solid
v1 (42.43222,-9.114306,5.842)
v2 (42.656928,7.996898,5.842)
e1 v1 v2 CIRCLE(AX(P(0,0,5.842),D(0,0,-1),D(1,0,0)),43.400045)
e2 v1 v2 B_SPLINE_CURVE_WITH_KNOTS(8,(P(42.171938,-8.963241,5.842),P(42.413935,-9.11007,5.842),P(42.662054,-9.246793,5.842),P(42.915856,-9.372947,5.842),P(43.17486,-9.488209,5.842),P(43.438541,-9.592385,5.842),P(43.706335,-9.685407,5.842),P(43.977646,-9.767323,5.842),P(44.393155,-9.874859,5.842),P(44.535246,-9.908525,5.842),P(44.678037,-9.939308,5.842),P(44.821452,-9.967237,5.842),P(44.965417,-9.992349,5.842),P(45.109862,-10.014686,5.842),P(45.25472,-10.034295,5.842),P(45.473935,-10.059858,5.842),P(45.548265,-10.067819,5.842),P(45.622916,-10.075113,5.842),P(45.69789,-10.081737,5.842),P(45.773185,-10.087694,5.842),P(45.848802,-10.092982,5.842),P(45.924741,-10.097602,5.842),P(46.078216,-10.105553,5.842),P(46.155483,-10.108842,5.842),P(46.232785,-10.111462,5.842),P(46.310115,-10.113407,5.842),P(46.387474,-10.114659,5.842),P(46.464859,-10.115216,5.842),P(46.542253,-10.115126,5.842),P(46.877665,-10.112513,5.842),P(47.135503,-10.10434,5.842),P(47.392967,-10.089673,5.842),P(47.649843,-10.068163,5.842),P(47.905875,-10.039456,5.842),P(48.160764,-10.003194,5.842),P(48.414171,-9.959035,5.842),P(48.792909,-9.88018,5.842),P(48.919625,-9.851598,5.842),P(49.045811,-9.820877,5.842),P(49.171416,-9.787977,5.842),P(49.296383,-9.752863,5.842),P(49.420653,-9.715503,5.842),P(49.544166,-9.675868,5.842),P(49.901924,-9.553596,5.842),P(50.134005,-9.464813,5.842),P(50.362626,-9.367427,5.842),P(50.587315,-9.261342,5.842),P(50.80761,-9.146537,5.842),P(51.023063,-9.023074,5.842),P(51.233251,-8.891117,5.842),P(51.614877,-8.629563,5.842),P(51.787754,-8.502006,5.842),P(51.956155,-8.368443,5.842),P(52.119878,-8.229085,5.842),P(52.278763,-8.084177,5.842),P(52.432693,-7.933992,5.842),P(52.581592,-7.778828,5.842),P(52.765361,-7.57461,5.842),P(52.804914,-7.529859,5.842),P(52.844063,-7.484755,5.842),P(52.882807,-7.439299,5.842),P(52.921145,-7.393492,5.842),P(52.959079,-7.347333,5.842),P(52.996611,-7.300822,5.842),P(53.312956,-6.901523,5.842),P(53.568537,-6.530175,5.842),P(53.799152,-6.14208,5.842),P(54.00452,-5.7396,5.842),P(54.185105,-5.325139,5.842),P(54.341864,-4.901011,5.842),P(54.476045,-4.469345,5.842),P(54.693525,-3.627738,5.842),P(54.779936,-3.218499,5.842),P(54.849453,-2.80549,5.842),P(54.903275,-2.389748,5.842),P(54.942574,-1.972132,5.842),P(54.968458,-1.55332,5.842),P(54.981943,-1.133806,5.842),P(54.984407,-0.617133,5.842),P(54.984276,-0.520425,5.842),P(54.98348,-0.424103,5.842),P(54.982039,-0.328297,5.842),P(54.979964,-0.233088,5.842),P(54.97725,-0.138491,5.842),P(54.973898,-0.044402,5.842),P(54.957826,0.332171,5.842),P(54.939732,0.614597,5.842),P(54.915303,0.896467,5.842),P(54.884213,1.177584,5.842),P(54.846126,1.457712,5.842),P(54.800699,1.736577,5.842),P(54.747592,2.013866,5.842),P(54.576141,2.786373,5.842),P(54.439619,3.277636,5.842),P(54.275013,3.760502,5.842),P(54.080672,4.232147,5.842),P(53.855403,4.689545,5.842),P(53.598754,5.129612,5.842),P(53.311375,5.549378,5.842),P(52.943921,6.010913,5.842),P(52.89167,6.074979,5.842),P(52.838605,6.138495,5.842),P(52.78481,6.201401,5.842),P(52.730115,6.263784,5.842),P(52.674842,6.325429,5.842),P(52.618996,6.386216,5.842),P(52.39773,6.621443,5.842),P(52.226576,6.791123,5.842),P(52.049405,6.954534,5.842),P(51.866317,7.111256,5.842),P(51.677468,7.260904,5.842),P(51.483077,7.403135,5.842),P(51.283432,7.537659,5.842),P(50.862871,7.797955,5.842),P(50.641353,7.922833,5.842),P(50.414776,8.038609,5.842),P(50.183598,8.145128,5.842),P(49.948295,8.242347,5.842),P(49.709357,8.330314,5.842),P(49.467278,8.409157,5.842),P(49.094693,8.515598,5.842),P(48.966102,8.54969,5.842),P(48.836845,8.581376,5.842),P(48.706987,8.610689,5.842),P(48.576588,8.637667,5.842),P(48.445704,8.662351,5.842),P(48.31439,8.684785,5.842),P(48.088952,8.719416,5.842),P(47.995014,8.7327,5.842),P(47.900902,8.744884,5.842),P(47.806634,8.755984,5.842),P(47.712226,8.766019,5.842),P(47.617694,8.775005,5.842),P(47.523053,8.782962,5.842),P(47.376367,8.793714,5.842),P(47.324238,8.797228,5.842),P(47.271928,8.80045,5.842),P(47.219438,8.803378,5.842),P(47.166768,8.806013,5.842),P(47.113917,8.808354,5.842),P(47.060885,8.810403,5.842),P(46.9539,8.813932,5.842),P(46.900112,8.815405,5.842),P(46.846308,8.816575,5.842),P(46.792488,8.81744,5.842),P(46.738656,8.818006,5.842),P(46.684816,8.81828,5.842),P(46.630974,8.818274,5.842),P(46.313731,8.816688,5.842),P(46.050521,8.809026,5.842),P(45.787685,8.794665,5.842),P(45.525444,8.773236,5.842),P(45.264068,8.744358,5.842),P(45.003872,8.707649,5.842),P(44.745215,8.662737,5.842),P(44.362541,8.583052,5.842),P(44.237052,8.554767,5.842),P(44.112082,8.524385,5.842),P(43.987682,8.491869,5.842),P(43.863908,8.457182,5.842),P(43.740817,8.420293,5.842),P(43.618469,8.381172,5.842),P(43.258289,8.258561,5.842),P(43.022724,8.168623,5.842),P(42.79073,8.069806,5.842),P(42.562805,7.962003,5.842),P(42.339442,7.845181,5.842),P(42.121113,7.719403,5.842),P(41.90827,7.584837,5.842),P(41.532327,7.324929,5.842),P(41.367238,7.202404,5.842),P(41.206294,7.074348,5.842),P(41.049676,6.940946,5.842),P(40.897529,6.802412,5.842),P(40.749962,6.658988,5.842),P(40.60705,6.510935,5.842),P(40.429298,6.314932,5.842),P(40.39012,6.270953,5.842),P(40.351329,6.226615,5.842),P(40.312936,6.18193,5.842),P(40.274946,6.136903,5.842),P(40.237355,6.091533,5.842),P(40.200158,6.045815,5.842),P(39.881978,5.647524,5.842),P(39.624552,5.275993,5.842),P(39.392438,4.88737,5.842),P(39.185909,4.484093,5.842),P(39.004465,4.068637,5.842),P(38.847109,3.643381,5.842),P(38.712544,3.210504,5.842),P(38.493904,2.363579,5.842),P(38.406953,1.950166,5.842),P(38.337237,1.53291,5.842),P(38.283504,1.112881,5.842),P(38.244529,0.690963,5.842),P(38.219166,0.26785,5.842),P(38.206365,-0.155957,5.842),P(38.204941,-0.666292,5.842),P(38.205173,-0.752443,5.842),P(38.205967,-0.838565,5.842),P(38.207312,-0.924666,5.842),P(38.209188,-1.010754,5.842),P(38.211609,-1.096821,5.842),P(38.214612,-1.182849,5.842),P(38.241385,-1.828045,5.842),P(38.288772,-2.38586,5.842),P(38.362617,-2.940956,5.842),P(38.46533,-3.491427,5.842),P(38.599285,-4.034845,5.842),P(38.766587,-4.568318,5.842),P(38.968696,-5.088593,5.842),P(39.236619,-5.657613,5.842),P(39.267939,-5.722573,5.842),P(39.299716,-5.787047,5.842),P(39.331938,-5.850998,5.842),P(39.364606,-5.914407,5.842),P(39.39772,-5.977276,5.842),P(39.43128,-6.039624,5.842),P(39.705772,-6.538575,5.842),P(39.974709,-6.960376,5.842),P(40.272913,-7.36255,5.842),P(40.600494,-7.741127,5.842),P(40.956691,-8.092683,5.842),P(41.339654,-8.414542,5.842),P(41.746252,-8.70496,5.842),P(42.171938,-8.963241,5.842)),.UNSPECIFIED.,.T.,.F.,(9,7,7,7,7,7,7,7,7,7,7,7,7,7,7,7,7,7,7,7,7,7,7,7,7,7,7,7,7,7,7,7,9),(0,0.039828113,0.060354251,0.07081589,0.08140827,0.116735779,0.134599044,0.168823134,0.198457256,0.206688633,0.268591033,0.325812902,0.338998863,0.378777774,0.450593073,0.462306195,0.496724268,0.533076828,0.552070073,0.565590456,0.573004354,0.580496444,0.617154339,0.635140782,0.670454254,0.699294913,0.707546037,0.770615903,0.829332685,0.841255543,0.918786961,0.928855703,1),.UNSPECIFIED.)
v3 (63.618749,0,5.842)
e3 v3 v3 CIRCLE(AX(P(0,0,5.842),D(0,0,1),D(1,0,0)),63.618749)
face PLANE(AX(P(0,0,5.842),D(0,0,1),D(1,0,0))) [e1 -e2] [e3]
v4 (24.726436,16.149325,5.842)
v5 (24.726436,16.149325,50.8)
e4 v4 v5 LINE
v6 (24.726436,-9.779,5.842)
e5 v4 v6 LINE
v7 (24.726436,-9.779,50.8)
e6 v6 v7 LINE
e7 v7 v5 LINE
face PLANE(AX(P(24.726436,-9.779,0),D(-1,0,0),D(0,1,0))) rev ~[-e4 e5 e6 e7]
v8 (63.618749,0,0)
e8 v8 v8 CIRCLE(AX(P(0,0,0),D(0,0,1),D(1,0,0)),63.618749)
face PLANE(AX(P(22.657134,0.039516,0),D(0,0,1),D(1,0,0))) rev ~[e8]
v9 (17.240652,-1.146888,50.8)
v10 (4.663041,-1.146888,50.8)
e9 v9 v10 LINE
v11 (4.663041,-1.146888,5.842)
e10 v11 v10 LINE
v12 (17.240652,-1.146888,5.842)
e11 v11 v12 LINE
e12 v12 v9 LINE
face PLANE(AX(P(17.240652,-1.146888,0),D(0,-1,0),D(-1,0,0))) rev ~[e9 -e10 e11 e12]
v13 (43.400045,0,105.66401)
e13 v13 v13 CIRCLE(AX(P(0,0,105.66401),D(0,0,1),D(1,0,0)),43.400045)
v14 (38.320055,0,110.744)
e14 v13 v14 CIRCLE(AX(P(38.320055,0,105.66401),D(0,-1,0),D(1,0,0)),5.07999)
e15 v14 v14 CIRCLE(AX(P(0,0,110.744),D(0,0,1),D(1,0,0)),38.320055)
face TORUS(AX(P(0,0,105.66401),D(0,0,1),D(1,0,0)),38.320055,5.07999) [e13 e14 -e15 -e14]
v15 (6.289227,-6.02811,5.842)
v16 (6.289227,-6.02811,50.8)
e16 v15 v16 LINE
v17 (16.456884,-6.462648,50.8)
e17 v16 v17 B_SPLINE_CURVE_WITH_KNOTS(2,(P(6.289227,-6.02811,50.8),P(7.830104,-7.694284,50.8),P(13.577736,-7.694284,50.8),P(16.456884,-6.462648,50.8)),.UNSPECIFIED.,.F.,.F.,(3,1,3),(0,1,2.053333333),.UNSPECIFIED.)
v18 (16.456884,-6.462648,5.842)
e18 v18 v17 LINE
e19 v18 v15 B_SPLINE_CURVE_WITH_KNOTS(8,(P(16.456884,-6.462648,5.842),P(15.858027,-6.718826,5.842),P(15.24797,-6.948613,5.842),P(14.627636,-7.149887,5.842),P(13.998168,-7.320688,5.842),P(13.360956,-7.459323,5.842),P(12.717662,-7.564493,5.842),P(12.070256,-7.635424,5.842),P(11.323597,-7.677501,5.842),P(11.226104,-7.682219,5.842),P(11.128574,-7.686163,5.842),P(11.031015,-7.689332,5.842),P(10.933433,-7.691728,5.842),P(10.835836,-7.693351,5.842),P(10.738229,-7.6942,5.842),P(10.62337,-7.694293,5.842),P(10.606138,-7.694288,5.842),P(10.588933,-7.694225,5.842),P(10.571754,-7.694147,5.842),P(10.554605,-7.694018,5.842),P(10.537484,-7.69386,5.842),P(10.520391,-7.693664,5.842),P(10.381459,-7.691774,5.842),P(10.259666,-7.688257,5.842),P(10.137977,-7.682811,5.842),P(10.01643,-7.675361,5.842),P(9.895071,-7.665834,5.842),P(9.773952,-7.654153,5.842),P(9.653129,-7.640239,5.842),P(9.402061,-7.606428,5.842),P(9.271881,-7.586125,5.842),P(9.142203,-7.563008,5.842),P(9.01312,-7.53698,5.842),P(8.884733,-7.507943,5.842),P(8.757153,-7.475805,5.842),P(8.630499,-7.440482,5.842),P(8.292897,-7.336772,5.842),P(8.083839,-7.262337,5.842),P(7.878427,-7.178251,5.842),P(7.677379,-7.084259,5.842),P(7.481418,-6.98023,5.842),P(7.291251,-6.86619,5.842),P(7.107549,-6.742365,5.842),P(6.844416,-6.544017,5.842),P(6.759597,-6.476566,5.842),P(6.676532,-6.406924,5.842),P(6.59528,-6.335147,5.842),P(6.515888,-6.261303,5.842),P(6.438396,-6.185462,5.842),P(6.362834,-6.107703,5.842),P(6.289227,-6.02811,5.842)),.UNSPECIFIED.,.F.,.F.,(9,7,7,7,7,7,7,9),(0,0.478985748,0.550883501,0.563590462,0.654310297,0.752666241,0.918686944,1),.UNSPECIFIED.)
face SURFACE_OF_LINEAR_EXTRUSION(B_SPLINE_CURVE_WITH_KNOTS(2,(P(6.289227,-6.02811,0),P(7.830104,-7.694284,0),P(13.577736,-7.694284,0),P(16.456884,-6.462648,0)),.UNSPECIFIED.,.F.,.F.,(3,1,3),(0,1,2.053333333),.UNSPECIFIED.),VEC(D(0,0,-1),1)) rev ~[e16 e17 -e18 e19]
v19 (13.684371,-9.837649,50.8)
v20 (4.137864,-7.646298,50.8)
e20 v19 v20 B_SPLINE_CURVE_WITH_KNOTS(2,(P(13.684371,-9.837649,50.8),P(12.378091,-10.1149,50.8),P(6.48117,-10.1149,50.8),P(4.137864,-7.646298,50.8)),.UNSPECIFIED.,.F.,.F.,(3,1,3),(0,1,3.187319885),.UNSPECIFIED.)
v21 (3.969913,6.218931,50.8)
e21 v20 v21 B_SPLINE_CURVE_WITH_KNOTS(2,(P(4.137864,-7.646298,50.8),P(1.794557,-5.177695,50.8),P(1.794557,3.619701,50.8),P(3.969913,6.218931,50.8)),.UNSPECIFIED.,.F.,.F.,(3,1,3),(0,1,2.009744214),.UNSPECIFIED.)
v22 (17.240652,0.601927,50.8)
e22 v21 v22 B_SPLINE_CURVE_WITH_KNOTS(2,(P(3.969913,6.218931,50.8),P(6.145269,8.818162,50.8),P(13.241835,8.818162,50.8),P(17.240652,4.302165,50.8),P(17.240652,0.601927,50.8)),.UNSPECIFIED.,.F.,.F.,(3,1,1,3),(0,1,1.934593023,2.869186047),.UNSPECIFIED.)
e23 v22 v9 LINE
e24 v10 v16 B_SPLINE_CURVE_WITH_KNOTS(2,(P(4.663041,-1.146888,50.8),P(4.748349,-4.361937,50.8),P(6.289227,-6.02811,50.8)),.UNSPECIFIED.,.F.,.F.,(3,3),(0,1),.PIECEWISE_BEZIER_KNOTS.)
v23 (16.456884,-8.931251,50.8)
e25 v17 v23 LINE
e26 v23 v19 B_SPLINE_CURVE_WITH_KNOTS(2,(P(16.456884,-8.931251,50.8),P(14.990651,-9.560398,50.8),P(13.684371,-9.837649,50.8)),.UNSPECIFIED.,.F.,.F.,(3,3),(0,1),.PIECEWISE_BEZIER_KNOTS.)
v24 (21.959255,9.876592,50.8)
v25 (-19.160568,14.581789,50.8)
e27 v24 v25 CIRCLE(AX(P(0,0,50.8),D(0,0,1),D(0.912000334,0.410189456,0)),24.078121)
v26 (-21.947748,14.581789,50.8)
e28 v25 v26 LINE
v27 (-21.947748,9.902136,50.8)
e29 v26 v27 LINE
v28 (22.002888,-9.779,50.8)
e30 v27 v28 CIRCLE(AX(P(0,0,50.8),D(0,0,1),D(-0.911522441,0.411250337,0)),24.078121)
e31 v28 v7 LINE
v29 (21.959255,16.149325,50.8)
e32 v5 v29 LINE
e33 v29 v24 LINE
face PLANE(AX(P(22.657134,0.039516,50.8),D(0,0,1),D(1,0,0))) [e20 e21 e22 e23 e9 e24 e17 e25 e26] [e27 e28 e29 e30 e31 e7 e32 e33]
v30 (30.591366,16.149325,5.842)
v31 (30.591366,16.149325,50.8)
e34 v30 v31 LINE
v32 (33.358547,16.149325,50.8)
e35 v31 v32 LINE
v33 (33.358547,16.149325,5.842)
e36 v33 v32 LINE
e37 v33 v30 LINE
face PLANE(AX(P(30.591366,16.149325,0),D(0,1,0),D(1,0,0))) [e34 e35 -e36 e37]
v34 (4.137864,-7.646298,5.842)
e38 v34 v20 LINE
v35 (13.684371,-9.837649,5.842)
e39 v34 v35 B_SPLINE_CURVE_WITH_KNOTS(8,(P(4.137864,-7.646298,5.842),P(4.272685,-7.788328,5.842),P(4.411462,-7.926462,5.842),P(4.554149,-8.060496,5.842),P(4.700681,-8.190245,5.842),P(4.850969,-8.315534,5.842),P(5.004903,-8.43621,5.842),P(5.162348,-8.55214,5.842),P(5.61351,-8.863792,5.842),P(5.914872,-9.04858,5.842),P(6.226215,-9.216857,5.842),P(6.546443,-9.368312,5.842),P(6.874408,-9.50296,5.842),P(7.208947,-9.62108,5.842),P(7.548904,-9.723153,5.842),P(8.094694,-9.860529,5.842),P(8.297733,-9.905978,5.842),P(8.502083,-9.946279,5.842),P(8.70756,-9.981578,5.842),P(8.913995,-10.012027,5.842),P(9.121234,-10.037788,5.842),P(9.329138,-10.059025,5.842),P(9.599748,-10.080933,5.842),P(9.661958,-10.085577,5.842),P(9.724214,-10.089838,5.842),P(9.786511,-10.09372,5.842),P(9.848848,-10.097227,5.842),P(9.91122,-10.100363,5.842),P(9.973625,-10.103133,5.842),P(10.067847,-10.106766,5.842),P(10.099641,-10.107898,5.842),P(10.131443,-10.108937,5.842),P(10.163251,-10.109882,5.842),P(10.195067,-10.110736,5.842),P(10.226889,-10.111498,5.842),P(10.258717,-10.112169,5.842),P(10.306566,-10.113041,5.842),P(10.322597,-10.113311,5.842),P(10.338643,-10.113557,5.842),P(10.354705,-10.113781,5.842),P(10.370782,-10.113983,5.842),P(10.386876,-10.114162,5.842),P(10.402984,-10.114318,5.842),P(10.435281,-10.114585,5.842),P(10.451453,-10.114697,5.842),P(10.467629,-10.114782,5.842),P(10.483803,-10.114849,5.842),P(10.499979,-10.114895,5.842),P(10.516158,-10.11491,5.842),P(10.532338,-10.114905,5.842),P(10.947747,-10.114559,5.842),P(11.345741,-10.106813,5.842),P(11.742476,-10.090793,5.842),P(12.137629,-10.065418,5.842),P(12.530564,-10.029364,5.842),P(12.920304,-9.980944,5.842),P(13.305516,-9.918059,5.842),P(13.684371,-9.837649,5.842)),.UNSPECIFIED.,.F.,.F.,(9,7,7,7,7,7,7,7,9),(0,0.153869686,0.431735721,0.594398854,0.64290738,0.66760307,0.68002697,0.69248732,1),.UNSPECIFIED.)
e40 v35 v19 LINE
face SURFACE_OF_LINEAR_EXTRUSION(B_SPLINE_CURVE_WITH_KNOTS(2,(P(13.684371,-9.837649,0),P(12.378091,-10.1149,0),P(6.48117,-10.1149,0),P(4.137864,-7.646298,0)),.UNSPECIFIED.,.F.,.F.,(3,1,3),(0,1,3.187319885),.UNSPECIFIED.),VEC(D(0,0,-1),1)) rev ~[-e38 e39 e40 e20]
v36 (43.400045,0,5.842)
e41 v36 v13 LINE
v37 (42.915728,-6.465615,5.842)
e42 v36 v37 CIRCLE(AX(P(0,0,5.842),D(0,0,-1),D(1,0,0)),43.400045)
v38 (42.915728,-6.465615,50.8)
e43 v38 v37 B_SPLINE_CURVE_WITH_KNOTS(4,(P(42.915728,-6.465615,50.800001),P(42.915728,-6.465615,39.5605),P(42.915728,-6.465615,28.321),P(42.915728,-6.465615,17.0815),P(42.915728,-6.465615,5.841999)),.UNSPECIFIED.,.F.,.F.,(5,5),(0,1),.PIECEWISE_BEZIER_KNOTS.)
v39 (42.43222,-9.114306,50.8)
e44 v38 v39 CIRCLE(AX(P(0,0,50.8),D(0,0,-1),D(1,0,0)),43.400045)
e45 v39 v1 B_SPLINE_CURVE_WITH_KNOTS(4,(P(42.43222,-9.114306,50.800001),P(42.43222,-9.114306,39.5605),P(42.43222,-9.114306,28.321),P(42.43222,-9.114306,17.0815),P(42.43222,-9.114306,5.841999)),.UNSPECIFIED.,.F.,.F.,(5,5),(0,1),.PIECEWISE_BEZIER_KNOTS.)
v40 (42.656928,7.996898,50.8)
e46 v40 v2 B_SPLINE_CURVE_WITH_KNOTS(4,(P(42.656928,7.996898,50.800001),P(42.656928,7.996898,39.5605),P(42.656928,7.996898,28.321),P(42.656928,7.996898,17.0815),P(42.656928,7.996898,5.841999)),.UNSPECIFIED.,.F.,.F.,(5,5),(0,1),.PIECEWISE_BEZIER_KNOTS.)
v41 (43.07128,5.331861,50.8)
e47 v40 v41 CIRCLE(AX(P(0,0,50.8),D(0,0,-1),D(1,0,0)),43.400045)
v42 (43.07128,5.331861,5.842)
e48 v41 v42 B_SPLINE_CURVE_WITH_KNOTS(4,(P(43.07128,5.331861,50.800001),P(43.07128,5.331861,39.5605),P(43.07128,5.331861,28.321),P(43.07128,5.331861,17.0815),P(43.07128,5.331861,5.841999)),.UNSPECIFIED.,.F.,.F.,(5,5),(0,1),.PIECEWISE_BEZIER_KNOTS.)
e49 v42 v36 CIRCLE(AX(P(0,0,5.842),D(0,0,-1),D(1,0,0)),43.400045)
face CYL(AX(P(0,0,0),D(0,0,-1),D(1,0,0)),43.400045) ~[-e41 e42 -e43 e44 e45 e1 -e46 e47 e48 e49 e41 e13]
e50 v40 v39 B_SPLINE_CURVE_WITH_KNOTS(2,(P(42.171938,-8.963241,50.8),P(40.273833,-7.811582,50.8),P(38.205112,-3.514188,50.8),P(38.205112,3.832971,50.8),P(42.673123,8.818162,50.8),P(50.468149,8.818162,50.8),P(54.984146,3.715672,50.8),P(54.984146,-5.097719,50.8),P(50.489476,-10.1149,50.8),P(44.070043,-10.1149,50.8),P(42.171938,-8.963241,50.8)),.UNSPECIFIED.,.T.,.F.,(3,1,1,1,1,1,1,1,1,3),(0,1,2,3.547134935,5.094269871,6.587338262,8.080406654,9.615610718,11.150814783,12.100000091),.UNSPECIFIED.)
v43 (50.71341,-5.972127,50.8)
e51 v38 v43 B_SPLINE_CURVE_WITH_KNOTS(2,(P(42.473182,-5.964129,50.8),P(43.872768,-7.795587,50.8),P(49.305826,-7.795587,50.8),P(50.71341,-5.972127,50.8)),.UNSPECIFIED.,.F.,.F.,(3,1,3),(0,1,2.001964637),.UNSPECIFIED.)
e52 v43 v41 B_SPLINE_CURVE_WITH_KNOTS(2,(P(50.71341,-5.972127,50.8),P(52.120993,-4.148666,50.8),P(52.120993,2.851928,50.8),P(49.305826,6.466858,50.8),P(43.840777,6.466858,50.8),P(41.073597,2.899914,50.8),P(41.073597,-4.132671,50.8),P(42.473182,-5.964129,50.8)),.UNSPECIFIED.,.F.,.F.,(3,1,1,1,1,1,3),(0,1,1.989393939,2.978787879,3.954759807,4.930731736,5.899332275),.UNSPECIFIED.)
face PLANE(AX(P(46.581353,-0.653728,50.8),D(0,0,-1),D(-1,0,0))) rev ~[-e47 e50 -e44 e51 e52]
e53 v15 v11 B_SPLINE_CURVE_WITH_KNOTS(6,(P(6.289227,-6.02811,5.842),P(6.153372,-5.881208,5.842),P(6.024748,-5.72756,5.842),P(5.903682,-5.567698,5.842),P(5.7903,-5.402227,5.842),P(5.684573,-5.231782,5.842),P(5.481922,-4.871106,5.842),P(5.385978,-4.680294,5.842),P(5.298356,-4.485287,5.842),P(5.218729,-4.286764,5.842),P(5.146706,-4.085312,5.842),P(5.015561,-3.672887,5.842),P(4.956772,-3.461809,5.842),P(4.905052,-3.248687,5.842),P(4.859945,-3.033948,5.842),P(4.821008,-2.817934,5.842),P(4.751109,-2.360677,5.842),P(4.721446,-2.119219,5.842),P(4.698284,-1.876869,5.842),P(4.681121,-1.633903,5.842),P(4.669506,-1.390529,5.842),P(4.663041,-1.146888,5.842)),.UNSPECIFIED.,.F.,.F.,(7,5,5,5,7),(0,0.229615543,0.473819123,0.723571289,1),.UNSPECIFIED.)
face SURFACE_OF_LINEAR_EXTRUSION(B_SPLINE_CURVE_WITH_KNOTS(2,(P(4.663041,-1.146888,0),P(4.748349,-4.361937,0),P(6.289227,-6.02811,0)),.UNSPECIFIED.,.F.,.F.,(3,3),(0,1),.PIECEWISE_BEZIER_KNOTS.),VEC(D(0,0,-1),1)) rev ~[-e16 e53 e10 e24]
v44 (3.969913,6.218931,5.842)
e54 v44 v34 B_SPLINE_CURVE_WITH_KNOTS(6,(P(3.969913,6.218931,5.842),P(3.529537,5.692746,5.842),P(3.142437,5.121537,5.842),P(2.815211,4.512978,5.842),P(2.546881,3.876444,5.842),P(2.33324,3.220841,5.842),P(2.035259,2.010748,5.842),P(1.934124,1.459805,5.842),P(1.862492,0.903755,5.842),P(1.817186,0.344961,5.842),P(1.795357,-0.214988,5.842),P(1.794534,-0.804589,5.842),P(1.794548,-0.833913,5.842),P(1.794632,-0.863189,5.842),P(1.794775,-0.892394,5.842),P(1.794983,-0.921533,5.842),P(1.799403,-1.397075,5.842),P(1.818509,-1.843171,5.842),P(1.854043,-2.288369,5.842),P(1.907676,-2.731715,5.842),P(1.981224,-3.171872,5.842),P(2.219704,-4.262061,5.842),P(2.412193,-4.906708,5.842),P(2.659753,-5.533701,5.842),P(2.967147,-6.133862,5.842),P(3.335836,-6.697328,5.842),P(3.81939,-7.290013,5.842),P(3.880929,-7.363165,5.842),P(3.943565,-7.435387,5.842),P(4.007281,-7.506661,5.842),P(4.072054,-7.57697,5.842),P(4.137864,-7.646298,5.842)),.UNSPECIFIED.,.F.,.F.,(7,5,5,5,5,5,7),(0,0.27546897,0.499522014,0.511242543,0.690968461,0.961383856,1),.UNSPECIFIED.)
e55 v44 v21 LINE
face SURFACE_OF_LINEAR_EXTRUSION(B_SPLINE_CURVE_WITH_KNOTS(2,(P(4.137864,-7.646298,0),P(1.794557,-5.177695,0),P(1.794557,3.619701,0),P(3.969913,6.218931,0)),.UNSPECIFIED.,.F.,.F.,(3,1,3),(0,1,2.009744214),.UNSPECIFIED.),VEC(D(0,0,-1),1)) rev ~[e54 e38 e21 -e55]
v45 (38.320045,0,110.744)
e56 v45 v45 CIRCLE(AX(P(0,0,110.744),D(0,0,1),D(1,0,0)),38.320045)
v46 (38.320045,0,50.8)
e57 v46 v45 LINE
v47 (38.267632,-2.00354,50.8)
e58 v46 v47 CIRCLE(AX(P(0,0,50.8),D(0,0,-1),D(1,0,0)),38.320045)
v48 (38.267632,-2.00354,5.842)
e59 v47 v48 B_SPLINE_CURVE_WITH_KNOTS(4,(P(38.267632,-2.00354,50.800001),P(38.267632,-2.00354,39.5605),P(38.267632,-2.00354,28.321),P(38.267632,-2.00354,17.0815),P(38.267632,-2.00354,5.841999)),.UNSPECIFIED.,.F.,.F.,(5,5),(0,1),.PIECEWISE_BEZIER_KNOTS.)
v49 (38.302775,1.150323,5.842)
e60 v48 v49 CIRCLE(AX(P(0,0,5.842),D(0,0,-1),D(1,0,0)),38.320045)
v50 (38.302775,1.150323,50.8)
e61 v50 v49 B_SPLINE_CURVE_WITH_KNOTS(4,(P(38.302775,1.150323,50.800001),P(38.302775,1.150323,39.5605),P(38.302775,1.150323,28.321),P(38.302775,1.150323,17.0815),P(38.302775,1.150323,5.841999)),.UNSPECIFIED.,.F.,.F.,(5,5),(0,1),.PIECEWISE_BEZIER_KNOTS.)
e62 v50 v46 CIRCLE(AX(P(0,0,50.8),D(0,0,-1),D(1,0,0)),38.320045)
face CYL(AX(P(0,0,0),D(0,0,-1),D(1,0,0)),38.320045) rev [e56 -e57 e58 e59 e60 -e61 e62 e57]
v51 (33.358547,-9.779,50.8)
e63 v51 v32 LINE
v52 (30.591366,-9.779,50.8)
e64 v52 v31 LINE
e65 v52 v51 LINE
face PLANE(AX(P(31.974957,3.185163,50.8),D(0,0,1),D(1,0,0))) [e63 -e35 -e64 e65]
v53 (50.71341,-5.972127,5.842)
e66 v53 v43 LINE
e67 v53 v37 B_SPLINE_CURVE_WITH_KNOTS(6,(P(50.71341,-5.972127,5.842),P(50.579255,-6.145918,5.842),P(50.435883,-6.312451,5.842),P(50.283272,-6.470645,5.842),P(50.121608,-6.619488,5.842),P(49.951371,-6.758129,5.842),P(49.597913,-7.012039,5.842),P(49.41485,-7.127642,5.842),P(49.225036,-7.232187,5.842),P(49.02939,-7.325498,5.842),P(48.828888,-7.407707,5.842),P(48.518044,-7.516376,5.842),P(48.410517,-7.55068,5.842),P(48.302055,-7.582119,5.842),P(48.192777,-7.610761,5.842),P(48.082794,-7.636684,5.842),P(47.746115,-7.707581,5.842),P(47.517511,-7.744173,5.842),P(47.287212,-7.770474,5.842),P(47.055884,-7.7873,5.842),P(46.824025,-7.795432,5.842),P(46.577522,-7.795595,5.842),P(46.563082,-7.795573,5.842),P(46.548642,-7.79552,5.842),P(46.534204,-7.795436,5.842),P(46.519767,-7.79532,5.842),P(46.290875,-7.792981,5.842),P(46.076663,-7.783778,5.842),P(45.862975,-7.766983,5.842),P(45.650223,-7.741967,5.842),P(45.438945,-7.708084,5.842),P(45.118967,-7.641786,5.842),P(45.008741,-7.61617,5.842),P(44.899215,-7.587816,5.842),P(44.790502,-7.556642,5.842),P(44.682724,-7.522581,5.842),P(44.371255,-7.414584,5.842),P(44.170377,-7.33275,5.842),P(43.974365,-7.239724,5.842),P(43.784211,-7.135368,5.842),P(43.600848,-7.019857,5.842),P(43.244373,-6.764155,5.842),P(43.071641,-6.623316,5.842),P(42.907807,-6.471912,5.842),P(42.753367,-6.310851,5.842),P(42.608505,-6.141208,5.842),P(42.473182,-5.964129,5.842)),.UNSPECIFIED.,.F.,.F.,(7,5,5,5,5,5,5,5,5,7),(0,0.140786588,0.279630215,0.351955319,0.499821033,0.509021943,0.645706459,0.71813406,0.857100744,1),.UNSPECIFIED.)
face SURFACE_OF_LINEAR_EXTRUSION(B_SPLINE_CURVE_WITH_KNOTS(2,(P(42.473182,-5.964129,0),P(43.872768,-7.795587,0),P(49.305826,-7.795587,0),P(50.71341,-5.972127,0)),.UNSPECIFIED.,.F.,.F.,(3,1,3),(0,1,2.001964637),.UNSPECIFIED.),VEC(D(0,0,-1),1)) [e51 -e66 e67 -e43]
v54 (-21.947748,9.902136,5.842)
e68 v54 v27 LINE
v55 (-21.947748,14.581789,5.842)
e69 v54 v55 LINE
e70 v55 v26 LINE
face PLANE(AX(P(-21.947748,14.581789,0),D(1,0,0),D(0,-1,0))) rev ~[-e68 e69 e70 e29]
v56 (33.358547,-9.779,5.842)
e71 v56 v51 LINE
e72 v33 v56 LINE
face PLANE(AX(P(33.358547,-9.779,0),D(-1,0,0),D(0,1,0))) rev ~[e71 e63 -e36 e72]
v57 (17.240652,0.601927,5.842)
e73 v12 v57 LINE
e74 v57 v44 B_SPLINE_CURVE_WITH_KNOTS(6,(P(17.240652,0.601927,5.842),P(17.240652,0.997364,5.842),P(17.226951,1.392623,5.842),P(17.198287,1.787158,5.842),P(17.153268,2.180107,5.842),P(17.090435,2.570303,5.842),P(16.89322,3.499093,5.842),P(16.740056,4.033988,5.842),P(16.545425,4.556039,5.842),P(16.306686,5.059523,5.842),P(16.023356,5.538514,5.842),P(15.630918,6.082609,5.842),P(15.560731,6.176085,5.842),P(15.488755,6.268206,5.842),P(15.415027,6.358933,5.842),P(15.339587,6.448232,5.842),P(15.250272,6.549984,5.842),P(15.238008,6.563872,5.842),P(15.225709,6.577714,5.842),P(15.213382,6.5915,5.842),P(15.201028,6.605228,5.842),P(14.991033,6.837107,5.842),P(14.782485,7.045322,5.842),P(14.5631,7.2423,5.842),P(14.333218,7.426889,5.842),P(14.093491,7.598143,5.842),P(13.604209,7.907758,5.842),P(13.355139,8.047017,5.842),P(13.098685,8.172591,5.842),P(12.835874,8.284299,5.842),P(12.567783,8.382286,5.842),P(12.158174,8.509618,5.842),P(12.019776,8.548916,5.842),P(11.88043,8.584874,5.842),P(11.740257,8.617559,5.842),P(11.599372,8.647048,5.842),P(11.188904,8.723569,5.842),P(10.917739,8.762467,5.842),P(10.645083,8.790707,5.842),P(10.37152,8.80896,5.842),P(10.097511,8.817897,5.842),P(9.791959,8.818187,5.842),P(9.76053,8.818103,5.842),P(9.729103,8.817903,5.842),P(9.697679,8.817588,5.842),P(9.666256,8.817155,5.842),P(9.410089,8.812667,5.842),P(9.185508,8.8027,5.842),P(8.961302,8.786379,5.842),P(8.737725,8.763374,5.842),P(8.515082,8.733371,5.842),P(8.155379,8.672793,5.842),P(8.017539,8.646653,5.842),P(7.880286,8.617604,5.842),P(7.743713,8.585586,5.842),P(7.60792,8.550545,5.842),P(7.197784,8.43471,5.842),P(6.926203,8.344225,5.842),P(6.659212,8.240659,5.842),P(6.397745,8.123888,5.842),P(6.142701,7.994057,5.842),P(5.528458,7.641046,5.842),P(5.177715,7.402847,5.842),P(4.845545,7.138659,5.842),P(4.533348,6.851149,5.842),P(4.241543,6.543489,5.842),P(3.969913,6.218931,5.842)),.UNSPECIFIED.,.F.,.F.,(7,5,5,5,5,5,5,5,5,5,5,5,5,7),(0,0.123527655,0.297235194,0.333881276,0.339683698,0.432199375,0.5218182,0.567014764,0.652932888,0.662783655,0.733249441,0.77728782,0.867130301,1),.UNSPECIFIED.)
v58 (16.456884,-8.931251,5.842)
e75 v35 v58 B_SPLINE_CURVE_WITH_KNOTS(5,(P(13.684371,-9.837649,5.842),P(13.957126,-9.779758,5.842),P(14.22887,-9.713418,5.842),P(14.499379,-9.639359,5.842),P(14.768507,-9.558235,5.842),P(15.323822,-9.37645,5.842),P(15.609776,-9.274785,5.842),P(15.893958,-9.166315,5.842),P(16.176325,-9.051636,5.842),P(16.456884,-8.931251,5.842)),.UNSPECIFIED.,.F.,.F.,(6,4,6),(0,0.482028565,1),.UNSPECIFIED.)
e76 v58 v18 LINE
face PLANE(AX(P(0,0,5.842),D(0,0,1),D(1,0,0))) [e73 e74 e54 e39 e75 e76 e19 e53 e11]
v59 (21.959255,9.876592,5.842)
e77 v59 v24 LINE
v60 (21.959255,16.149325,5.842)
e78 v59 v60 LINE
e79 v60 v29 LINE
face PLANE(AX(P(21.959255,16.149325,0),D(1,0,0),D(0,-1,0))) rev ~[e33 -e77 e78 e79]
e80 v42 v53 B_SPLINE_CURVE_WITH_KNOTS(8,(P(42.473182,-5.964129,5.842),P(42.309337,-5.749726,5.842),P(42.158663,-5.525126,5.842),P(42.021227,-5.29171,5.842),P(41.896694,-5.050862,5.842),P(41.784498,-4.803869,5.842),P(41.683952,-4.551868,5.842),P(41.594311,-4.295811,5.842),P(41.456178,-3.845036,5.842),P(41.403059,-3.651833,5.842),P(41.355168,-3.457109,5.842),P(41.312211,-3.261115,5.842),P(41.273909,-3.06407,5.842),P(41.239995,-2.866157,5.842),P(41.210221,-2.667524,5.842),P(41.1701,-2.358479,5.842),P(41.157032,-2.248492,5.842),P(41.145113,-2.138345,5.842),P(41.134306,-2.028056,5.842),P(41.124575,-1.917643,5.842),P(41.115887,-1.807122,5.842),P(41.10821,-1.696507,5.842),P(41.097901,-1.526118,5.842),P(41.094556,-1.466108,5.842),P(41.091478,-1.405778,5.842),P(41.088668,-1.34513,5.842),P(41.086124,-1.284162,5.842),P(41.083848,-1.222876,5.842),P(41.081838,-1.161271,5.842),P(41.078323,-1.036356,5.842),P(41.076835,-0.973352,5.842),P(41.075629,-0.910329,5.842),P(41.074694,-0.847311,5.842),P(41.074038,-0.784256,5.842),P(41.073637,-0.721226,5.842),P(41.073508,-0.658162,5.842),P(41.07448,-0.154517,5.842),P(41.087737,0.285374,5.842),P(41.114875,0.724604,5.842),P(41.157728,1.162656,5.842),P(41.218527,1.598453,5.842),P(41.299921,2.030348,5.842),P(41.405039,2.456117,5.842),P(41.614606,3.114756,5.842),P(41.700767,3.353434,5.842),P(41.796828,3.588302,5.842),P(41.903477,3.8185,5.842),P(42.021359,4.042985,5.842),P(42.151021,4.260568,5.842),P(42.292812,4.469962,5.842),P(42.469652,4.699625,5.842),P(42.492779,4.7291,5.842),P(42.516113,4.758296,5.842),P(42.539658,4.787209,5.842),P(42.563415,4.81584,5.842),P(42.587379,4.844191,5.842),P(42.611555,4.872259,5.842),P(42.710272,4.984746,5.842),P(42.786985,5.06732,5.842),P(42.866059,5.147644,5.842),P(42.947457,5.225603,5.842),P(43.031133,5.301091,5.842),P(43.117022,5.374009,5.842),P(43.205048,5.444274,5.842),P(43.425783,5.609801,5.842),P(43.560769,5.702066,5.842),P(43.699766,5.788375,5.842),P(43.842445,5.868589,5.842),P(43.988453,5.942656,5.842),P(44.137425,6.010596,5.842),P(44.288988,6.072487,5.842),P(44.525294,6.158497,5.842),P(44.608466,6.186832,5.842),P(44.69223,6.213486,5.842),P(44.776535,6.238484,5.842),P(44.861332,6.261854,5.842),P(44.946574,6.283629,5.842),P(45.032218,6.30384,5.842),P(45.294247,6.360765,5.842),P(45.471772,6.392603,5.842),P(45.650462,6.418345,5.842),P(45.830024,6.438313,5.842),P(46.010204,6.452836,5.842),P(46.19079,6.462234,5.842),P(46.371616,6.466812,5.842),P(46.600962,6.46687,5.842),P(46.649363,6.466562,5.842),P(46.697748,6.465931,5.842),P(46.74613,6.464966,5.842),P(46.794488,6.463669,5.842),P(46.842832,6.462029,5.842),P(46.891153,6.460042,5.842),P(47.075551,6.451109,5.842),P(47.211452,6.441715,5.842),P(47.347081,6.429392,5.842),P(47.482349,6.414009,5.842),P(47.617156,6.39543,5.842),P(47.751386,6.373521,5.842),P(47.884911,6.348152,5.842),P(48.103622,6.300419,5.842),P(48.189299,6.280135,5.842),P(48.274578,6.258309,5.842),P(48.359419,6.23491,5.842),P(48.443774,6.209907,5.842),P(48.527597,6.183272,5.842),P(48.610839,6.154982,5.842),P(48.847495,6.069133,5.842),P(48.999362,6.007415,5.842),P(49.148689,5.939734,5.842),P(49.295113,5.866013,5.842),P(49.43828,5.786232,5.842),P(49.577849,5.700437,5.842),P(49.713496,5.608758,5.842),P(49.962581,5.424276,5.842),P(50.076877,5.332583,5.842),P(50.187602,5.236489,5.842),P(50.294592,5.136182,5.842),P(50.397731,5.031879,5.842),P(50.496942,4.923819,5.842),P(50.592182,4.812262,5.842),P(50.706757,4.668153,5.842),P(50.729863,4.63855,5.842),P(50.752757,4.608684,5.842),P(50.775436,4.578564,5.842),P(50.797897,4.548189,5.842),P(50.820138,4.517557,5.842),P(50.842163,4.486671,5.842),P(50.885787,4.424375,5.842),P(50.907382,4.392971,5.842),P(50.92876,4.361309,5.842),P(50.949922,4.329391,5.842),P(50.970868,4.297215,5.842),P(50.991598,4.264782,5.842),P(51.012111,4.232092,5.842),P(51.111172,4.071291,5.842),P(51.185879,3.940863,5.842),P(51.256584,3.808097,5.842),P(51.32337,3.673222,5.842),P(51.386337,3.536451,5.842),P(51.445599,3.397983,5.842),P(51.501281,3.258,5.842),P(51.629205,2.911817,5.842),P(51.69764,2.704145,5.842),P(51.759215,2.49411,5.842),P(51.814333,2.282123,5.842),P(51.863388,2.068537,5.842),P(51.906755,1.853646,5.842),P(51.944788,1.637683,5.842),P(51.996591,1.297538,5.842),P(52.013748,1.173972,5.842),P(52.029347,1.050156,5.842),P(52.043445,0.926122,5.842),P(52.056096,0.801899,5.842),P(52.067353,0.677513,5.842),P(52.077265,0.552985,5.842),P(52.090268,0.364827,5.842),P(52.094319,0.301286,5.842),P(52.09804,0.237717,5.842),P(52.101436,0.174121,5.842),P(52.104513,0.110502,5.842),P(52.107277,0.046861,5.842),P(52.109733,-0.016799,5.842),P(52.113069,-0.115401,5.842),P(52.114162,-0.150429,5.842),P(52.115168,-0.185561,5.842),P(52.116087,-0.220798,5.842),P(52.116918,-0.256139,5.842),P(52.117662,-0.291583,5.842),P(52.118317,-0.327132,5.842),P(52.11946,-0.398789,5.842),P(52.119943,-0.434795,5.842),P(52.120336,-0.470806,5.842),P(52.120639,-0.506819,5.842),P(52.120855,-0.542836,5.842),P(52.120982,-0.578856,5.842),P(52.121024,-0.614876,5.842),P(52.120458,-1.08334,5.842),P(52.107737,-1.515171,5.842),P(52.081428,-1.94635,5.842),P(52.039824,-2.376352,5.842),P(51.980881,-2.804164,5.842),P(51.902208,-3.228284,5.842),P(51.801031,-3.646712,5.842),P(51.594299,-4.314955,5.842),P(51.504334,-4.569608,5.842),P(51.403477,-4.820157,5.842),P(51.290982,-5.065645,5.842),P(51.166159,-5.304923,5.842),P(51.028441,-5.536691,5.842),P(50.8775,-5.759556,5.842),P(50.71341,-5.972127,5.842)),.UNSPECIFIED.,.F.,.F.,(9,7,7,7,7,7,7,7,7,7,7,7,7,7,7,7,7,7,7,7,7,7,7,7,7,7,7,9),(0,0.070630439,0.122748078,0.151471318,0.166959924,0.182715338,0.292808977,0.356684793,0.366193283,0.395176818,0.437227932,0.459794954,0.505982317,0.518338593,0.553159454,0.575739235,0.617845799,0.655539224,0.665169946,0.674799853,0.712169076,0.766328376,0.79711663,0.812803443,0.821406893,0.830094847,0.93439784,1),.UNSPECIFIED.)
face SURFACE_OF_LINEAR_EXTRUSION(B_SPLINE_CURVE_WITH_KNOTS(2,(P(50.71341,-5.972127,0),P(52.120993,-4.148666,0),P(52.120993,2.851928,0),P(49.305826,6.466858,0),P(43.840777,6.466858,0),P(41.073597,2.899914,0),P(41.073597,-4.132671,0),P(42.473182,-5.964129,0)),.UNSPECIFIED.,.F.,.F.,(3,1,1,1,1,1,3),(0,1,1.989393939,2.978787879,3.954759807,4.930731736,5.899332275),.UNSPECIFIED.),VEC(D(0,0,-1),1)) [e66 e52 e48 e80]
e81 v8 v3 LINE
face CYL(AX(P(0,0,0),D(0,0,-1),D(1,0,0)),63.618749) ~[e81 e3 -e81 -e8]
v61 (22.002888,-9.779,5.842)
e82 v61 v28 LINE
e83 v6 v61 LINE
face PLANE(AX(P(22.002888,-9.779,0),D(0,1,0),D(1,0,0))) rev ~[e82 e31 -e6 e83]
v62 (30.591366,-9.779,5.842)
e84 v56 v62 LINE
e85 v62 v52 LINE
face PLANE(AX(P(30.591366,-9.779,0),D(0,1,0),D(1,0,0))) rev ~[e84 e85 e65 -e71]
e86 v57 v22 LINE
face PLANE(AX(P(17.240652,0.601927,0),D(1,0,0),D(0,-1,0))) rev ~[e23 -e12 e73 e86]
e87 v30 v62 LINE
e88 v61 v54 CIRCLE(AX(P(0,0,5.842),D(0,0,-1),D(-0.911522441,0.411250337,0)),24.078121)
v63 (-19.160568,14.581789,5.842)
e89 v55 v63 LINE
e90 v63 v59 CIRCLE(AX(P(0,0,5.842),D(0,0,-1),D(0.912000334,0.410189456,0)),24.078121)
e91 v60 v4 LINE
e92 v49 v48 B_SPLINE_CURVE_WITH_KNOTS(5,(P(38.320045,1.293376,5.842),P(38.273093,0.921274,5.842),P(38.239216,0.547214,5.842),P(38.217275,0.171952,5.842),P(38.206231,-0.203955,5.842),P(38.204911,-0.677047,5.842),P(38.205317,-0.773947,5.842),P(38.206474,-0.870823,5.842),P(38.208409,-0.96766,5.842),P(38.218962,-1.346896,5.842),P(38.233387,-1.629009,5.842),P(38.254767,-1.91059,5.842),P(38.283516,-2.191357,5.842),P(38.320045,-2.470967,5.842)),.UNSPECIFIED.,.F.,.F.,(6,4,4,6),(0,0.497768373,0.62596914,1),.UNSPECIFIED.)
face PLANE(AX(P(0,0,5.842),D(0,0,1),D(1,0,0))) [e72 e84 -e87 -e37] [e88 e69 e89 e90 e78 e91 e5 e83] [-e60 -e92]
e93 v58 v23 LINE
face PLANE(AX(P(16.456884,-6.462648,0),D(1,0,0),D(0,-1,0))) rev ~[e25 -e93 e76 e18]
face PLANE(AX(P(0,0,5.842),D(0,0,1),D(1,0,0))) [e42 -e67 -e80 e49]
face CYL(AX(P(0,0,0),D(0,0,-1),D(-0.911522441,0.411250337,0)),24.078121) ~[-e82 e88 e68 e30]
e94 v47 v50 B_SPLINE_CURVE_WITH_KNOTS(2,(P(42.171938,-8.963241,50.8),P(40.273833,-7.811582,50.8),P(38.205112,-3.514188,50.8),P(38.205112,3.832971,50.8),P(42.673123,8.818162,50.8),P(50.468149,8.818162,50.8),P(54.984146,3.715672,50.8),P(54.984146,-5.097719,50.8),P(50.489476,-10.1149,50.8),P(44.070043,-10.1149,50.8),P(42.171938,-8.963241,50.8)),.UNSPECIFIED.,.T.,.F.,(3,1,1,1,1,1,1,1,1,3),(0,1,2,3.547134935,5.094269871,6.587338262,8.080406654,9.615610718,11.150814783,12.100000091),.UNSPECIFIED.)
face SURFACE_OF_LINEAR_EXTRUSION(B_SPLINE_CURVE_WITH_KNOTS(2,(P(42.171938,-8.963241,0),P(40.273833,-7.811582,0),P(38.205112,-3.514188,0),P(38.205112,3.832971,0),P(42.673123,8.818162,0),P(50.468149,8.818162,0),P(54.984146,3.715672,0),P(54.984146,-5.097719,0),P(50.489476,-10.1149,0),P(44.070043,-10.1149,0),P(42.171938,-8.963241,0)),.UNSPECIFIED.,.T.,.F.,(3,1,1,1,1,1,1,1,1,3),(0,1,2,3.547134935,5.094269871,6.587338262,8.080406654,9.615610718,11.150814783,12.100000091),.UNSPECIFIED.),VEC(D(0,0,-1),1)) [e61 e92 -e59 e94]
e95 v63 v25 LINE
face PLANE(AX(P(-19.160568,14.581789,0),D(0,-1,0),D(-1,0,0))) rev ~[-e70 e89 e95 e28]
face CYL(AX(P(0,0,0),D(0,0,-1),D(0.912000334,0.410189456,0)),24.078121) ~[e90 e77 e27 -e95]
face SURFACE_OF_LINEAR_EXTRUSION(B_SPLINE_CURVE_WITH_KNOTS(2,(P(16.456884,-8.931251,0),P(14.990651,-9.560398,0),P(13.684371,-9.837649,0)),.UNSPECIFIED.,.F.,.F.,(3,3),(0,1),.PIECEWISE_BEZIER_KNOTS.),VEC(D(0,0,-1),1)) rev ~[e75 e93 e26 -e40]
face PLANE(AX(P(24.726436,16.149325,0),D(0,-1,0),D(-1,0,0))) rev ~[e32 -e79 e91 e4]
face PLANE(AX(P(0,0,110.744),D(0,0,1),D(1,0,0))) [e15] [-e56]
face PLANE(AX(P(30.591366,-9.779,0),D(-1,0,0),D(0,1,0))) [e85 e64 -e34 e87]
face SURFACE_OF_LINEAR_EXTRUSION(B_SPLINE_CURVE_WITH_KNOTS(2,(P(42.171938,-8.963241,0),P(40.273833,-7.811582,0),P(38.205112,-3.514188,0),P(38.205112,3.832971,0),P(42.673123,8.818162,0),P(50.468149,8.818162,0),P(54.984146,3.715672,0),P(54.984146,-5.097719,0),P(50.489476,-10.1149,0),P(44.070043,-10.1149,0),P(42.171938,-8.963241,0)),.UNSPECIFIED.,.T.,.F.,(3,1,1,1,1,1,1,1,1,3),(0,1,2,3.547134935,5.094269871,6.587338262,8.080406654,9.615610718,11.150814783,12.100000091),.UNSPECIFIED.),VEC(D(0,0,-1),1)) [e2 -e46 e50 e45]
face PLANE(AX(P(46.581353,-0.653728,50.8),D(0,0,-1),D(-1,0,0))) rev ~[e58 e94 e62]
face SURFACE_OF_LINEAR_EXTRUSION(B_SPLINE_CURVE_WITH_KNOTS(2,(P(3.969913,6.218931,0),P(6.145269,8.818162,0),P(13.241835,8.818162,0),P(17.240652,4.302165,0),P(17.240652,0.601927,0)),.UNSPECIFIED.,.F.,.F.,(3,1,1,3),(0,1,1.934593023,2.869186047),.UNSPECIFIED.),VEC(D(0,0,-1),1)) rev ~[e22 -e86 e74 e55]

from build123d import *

# Parameters (mm, degrees)
F0_R     = 43.4000447198
F1_DEPTH = 110.744
F2_T     = -5.08
F3_R     = 63.6187489092
F4_DEPTH = 5.842
F5_R     = 5.07999
F6_W     = 2.7671808675
F6_H     = 25.928324776
F7_DEPTH = 50.8


# Not quite as in the source:
# - a fillet or chamfer is up to 0.001 mm smaller than in the source, because OpenCascade refuses the exact size


with BuildPart() as f1:
    # F0 (on Top) → F1 (new body)
    with BuildSketch(Plane.XY):
        Circle(F0_R)
    extrude(amount=F1_DEPTH)

    # F2
    f2_openings = [f1.faces().sort_by_distance(p)[0] for p in [
        (0, 0, 110.744),
    ]]
    offset(amount=F2_T, openings=f2_openings)

    # F3 (on Top) → F4 (join)
    with BuildSketch(Plane.XY):
        Circle(F3_R)
    extrude(amount=F4_DEPTH)

    # F5 (radius 5.08 in the source; OpenCascade refuses exactly that, so slightly less here)
    f5_edges = [f1.edges().sort_by_distance(p)[0] for p in [
        (-43.400045, 0, 110.744),
    ]]
    fillet(f5_edges, radius=F5_R)

    # F6 (on Top) → F7 (join)
    with BuildSketch(Plane.XY):
        with BuildLine():
            ThreePointArc((22.0028883346, -9.7789997235), (23.5536000152, -4.9983854371), (24.0781214104, 0))
            ThreePointArc((24.0781214104, 0), (23.5424460635, 5.0506597592), (21.9592547789, 9.8765915281))
            Line((21.9592547789, 9.8765915281), (21.9592547789, -9.7789997235))
            Line((21.9592547789, -9.7789997235), (22.0028883346, -9.7789997235))
        make_face()
        with BuildLine():
            ThreePointArc((21.9592547789, 9.8765915281), (23.5424460635, 5.0506597592), (24.0781214104, 0))
            ThreePointArc((24.0781214104, 0), (23.5536000152, -4.9983854371), (22.0028883346, -9.7789997235))
            Line((22.0028883346, -9.7789997235), (24.7264356464, -9.7789997235))
            Line((24.7264356464, -9.7789997235), (24.7264356464, 16.1493250525))
            Line((24.7264356464, 16.1493250525), (21.9592547789, 16.1493250525))
            Line((21.9592547789, 16.1493250525), (21.9592547789, 9.8765915281))
        make_face()
        with BuildLine():
            Line((21.9592547789, -9.7789997235), (21.9592547789, 9.8765915281))
            ThreePointArc((21.9592547789, 9.8765915281), (2.7373131328, 23.9220201377), (-19.1605677938, 14.5817890698))
            Line((-19.1605677938, 14.5817890698), (-19.1165860754, 14.5817890698))
            Line((-19.1165860754, 14.5817890698), (-19.1165860754, 4.2168572654))
            Line((-19.1165860754, 4.2168572654), (-6.283051686, 4.2168572654))
            Line((-6.283051686, 4.2168572654), (-6.283051686, 14.5817890698))
            Line((-6.283051686, 14.5817890698), (-3.4518897579, 14.5817890698))
            Line((-3.4518897579, 14.5817890698), (-3.4518897579, -9.7789997235))
            Line((-3.4518897579, -9.7789997235), (-6.283051686, -9.7789997235))
            Line((-6.283051686, -9.7789997235), (-6.283051686, 1.6842736198))
            Line((-6.283051686, 1.6842736198), (-19.1165860754, 1.6842736198))
            Line((-19.1165860754, 1.6842736198), (-19.1165860754, -9.7789997235))
            Line((-19.1165860754, -9.7789997235), (-21.9477480035, -9.7789997235))
            Line((-21.9477480035, -9.7789997235), (-21.9477480035, 9.9021355389))
            ThreePointArc((-21.9477480035, 9.9021355389), (-9.8406062526, -21.9754044158), (22.0028883346, -9.7789997235))
            Line((22.0028883346, -9.7789997235), (21.9592547789, -9.7789997235))
        make_face()
        with BuildLine():
            add(Edge.make_bspline(
                [(13.6843709515, -9.837649029), (12.3780909659, -10.1149002912), (10.5279719658, -10.1149002912)],
                knots=[0, 0, 0, 1, 1, 1], degree=2))
            add(Edge.make_bspline(
                [(10.5279719658, -10.1149002912), (6.4811698879, -10.1149002912), (4.1378635463, -7.6462977061)],
                knots=[0, 0, 0, 1, 1, 1], degree=2))
            add(Edge.make_bspline(
                [(4.1378635463, -7.6462977061), (1.7945572048, -5.177695121), (1.7945572048, -0.8003242304)],
                knots=[0, 0, 0, 1, 1, 1], degree=2))
            add(Edge.make_bspline(
                [(1.7945572048, -0.8003242304), (1.7945572048, 3.6197007006), (3.9699132625, 6.2189312842)],
                knots=[0, 0, 0, 1, 1, 1], degree=2))
            add(Edge.make_bspline(
                [(3.9699132625, 6.2189312842), (6.1452693202, 8.8181618679), (9.81351679, 8.8181618679)],
                knots=[0, 0, 0, 1, 1, 1], degree=2))
            add(Edge.make_bspline(
                [(9.81351679, 8.8181618679), (13.2418352829, 8.8181618679), (15.2412434242, 6.560163607)],
                knots=[0, 0, 0, 1, 1, 1], degree=2))
            add(Edge.make_bspline(
                [(15.2412434242, 6.560163607), (17.2406515655, 4.3021653461), (17.2406515655, 0.601927346)],
                knots=[0, 0, 0, 1, 1, 1], degree=2))
            Line((17.2406515655, 0.601927346), (17.2406515655, -1.1468883082))
            Line((17.2406515655, -1.1468883082), (4.6630414181, -1.1468883082))
            add(Edge.make_bspline(
                [(4.6630414181, -1.1468883082), (4.7483494988, -4.3619365994), (6.2892267063, -6.0281100505)],
                knots=[0, 0, 0, 1, 1, 1], degree=2))
            add(Edge.make_bspline(
                [(6.2892267063, -6.0281100505), (7.8301039139, -7.6942835015), (10.6292753117, -7.6942835015)],
                knots=[0, 0, 0, 1, 1, 1], degree=2))
            add(Edge.make_bspline(
                [(10.6292753117, -7.6942835015), (13.5777358507, -7.6942835015), (16.4568835741, -6.4626480865)],
                knots=[0, 0, 0, 1, 1, 1], degree=2))
            Line((16.4568835741, -6.4626480865), (16.4568835741, -8.9312506716))
            add(Edge.make_bspline(
                [(16.4568835741, -8.9312506716), (14.9906509372, -9.5603977667), (13.6843709515, -9.837649029)],
                knots=[0, 0, 0, 1, 1, 1], degree=2))
        make_face(mode=Mode.SUBTRACT)
        with BuildLine():
            Line((-19.1165860754, 14.5817890698), (-19.1605677938, 14.5817890698))
            ThreePointArc((-19.1605677938, 14.5817890698), (-20.6869088124, 12.3210281406), (-21.9477480035, 9.9021355389))
            Line((-21.9477480035, 9.9021355389), (-21.9477480035, -9.7789997235))
            Line((-21.9477480035, -9.7789997235), (-19.1165860754, -9.7789997235))
            Line((-19.1165860754, -9.7789997235), (-19.1165860754, 1.6842736198))
            Line((-19.1165860754, 1.6842736198), (-6.283051686, 1.6842736198))
            Line((-6.283051686, 1.6842736198), (-6.283051686, -9.7789997235))
            Line((-6.283051686, -9.7789997235), (-3.4518897579, -9.7789997235))
            Line((-3.4518897579, -9.7789997235), (-3.4518897579, 14.5817890698))
            Line((-3.4518897579, 14.5817890698), (-6.283051686, 14.5817890698))
            Line((-6.283051686, 14.5817890698), (-6.283051686, 4.2168572654))
            Line((-6.283051686, 4.2168572654), (-19.1165860754, 4.2168572654))
            Line((-19.1165860754, 4.2168572654), (-19.1165860754, 14.5817890698))
        make_face()
        with BuildLine():
            ThreePointArc((-21.9477480035, 9.9021355389), (-20.6869088124, 12.3210281406), (-19.1605677938, 14.5817890698))
            Line((-19.1605677938, 14.5817890698), (-21.9477480035, 14.5817890698))
            Line((-21.9477480035, 14.5817890698), (-21.9477480035, 9.9021355389))
        make_face()
        with Locations((31.9749566279, 3.1851626645)):
            Rectangle(F6_W, F6_H)
        with BuildLine():
            add(Edge.make_bspline(
                [(54.9841455177, -0.629708069), (54.9841455177, -5.0977187954), (52.7368107669, -7.6063095433)],
                knots=[0, 0, 0, 1, 1, 1], degree=2))
            add(Edge.make_bspline(
                [(52.7261472568, 6.2669170796), (54.9841455177, 3.7156722913), (54.9841455177, -0.629708069)],
                knots=[0, 0, 0, 1, 1, 1], degree=2))
            add(Edge.make_bspline(
                [(46.6399488748, 8.8181618679), (50.4681489959, 8.8181618679), (52.7261472568, 6.2669170796)],
                knots=[0, 0, 0, 1, 1, 1], degree=2))
            add(Edge.make_bspline(
                [(40.4391177593, 6.3255663851), (42.6731231225, 8.8181618679), (46.6399488748, 8.8181618679)],
                knots=[0, 0, 0, 1, 1, 1], degree=2))
            add(Edge.make_bspline(
                [(38.2051123961, -0.629708069), (38.2051123961, 3.8329709023), (40.4391177593, 6.3255663851)],
                knots=[0, 0, 0, 1, 1, 1], degree=2))
            add(Edge.make_bspline(
                [(39.2394728745, -5.66288483), (38.2051123961, -3.5141875475), (38.2051123961, -0.629708069)],
                knots=[0, 0, 0, 1, 1, 1], degree=2))
            add(Edge.make_bspline(
                [(42.1719381484, -8.9632412019), (40.2738333529, -7.8115821125), (39.2394728745, -5.66288483)],
                knots=[0, 0, 0, 1, 1, 1], degree=2))
            add(Edge.make_bspline(
                [(46.5226502638, -10.1149002912), (44.0700429438, -10.1149002912), (42.1719381484, -8.9632412019)],
                knots=[0, 0, 0, 1, 1, 1], degree=2))
            add(Edge.make_bspline(
                [(52.7368107669, -7.6063095433), (50.4894760161, -10.1149002912), (46.5226502638, -10.1149002912)],
                knots=[0, 0, 0, 1, 1, 1], degree=2))
        make_face()
        with BuildLine():
            add(Edge.make_bspline(
                [(41.0735966094, -0.629708069), (41.0735966094, -4.1326711325), (42.4731823083, -5.9641289899)],
                knots=[0, 0, 0, 1, 1, 1], degree=2))
            add(Edge.make_bspline(
                [(42.4571870432, 4.6833858317), (41.0735966094, 2.8999137697), (41.0735966094, -0.629708069)],
                knots=[0, 0, 0, 1, 1, 1], degree=2))
            add(Edge.make_bspline(
                [(46.5546407941, 6.4668578937), (43.840777477, 6.4668578937), (42.4571870432, 4.6833858317)],
                knots=[0, 0, 0, 1, 1, 1], degree=2))
            add(Edge.make_bspline(
                [(50.7134097279, 4.659392934), (49.3058263964, 6.4668578937), (46.5546407941, 6.4668578937)],
                knots=[0, 0, 0, 1, 1, 1], degree=2))
            add(Edge.make_bspline(
                [(52.1209930594, -0.629708069), (52.1209930594, 2.8519279743), (50.7134097279, 4.659392934)],
                knots=[0, 0, 0, 1, 1, 1], degree=2))
            add(Edge.make_bspline(
                [(50.7134097279, -5.9721266225), (52.1209930594, -4.1486663977), (52.1209930594, -0.629708069)],
                knots=[0, 0, 0, 1, 1, 1], degree=2))
            add(Edge.make_bspline(
                [(46.5866313243, -7.7955868474), (49.3058263964, -7.7955868474), (50.7134097279, -5.9721266225)],
                knots=[0, 0, 0, 1, 1, 1], degree=2))
            add(Edge.make_bspline(
                [(42.4731823083, -5.9641289899), (43.8727680072, -7.7955868474), (46.5866313243, -7.7955868474)],
                knots=[0, 0, 0, 1, 1, 1], degree=2))
        make_face(mode=Mode.SUBTRACT)
    extrude(amount=F7_DEPTH)


solid = f1.part
